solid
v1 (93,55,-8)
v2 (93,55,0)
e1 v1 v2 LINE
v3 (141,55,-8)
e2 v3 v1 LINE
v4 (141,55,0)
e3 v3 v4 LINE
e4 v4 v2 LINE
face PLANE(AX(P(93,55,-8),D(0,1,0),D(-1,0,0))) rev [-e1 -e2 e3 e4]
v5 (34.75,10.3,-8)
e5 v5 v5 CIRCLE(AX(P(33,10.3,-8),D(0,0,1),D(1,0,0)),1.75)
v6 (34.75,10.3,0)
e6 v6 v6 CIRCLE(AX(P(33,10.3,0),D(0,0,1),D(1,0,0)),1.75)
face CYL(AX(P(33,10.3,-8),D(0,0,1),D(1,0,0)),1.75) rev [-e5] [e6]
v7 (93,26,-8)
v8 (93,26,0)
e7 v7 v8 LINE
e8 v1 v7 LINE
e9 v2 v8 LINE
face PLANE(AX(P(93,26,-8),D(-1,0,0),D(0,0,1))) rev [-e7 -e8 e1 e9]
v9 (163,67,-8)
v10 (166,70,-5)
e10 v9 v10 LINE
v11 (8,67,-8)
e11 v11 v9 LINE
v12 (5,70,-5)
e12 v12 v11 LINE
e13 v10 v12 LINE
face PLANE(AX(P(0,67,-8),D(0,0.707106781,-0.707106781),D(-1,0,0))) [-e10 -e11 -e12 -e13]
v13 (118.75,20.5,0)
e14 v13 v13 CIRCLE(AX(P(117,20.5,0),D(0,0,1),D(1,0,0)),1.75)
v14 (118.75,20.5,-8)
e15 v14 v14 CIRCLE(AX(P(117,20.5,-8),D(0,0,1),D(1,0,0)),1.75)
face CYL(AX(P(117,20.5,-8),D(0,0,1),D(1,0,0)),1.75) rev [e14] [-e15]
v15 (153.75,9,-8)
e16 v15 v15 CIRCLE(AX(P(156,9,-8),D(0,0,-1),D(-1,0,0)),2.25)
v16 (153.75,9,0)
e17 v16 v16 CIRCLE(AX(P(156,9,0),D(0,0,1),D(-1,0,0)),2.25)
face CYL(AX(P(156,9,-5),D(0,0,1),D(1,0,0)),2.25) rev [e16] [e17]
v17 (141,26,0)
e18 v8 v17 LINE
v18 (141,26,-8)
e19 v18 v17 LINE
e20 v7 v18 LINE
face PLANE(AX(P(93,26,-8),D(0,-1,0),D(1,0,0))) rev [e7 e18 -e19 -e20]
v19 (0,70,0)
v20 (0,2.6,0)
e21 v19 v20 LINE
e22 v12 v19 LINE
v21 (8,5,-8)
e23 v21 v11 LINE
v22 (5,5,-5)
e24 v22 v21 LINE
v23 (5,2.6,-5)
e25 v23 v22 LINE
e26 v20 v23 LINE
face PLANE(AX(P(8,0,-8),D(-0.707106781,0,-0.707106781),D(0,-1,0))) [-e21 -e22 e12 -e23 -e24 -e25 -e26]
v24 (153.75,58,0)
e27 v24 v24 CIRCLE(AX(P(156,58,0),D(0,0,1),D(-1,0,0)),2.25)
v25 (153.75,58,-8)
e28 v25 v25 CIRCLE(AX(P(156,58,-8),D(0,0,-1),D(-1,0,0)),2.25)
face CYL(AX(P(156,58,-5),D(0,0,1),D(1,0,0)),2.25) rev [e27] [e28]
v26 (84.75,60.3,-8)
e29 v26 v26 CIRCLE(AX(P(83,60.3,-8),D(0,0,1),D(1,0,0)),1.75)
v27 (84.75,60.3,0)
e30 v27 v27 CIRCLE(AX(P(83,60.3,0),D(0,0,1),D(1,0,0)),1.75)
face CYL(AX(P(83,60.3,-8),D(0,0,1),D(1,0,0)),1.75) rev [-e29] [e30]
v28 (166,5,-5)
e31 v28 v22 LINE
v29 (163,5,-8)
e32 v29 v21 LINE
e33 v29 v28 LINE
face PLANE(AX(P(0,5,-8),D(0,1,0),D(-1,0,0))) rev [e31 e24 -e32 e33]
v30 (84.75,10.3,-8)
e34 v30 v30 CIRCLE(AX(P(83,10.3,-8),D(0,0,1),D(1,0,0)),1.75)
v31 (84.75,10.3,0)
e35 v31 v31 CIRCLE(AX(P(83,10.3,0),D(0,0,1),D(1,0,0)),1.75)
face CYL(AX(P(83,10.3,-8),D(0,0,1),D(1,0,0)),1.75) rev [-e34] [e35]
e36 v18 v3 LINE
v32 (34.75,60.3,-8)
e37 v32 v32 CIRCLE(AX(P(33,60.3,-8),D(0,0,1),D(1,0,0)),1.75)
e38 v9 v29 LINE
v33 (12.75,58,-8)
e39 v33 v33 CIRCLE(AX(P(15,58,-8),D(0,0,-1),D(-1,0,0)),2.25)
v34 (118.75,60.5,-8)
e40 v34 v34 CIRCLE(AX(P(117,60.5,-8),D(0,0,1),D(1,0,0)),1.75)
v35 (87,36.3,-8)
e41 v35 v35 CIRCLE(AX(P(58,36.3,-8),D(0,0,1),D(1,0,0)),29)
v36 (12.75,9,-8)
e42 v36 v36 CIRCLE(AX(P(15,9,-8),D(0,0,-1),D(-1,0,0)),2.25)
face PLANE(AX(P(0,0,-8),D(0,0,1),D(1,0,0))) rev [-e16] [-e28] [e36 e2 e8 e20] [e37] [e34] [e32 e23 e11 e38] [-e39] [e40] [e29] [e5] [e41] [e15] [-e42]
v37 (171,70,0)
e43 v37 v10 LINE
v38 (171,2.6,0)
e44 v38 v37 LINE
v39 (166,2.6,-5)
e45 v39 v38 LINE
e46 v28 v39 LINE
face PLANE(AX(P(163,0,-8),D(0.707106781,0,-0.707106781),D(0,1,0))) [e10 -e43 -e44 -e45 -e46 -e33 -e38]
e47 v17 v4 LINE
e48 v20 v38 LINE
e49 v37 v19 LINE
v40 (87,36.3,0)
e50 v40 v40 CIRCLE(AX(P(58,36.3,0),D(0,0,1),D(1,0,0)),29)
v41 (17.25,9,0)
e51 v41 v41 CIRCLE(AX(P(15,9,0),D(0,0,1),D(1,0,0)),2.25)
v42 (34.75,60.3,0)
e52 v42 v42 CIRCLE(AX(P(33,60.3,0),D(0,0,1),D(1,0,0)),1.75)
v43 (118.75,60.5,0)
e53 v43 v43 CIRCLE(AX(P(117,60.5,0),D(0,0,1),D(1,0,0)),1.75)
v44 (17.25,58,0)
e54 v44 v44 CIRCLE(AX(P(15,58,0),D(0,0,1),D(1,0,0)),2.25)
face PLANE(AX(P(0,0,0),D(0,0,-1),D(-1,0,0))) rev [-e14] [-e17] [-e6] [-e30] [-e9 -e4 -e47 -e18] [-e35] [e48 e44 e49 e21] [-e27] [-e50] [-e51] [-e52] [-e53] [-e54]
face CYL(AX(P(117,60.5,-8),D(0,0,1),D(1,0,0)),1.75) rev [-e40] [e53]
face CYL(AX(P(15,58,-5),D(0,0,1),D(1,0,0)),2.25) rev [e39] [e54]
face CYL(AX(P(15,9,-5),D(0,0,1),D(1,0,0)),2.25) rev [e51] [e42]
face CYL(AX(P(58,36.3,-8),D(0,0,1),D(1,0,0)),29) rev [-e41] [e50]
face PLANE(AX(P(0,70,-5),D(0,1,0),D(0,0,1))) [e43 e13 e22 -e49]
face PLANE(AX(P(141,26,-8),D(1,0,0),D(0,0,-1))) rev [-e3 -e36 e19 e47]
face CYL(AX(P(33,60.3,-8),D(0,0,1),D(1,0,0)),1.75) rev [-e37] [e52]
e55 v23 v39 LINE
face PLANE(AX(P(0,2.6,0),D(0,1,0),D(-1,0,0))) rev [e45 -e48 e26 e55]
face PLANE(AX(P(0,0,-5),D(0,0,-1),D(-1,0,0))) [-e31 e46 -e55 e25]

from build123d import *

# Parameters (mm, degrees)
SKETCH1_W           = 171
SKETCH1_H           = 70
SKETCH1_R           = 2.25
BOSS_EXTRUDE1_DEPTH = 5
SKETCH2_W           = 171
SKETCH2_H           = 65
SKETCH2_R           = 2.25
BOSS_EXTRUDE2_DEPTH = 3
CHAMFER1_SIZE       = 8
CHAMFER3_SIZE       = 3
SKETCH3_W           = 7.071067812
SKETCH3_H           = 2.6
CUT_EXTRUDE1_DEPTH  = 199.002168661
SKETCH4_R           = 29
SKETCH4_R_2         = 1.75
SKETCH4_W           = 48
SKETCH4_H           = 29
CUT_EXTRUDE2_DEPTH  = 185.945938047


with BuildPart() as part:
    # Sketch1 → Boss-Extrude1 (new body)
    with BuildSketch(Plane.XY):
        with Locations((85.5, 35)):
            Rectangle(SKETCH1_W, SKETCH1_H)
        with Locations((15, 9)):
            Circle(SKETCH1_R, mode=Mode.SUBTRACT)
        with Locations(Location((156, 9, 0), (0, 0, 180))):
            Circle(SKETCH1_R, mode=Mode.SUBTRACT)
        with Locations((15, 58)):
            Circle(SKETCH1_R, mode=Mode.SUBTRACT)
        with Locations(Location((156, 58, 0), (0, 0, 180))):
            Circle(SKETCH1_R, mode=Mode.SUBTRACT)
    extrude(amount=-BOSS_EXTRUDE1_DEPTH)

    # Sketch2 → Boss-Extrude2 (add)
    with BuildSketch(Plane(origin=(0, 0, -5), x_dir=(-1, 0, 0), z_dir=(0, 0, -1))):
        with Locations((-85.5, 37.5)):
            Rectangle(SKETCH2_W, SKETCH2_H)
        with Locations(Location((-15, 9, 0), (0, 0, 180))):
            Circle(SKETCH2_R, mode=Mode.SUBTRACT)
        with Locations((-156, 9)):
            Circle(SKETCH2_R, mode=Mode.SUBTRACT)
        with Locations(Location((-15, 58, 0), (0, 0, 180))):
            Circle(SKETCH2_R, mode=Mode.SUBTRACT)
        with Locations((-156, 58)):
            Circle(SKETCH2_R, mode=Mode.SUBTRACT)
    extrude(amount=BOSS_EXTRUDE2_DEPTH)

    # Chamfer1
    # the kernel refuses this chamfer: 8 mm, written as the material it takes off along each edge
    with BuildSketch(Plane(origin=(171, -15.573463904, -8), x_dir=(-0.9996219169112968, 0, -0.027495876610586296), z_dir=(0, 1, 0)), Plane(origin=(0, 90.573463904, -8), x_dir=(0.9996219169112968, 0, -0.027495876610586275), z_dir=(0, -1, 0))) as chamfer1_piece_1:
        Polygon((CHAMFER1_SIZE * 0.999621916911, CHAMFER1_SIZE * 0.0274958766106), (-CHAMFER1_SIZE * 0.0274958766106, CHAMFER1_SIZE * 0.999621916911), (0, 0), align=None)
    extrude(amount=106.146927807, mode=Mode.SUBTRACT)

    # Chamfer3
    chamfer3_edges = [part.edges().sort_by_distance(p)[0] for p in [
        (85.5, 70, -8),
    ]]
    chamfer(chamfer3_edges, length=CHAMFER3_SIZE)

    # Sketch3 → Cut-Extrude1 (cut, through all, along a direction that is not the sketch's normal)
    with BuildSketch(Plane(origin=(85.5, 0, -85.5), x_dir=(-0.7071067811865452, 0, -0.7071067811865498), z_dir=(0.7071067811865498, 0, -0.7071067811865452))):
        with Locations((-117.379725677, 1.3)):
            Rectangle(SKETCH3_W, SKETCH3_H)
    extrude(amount=-CUT_EXTRUDE1_DEPTH, dir=(1, 0, 0), mode=Mode.SUBTRACT)

    # Sketch4 → Cut-Extrude2 (cut, through all)
    with BuildSketch(Plane.XY):
        with Locations((58, 36.3)):
            Circle(SKETCH4_R)
        with Locations((33, 60.3)):
            Circle(SKETCH4_R_2)
        with Locations((83, 60.3)):
            Circle(SKETCH4_R_2)
        with Locations((83, 10.3)):
            Circle(SKETCH4_R_2)
        with Locations((33, 10.3)):
            Circle(SKETCH4_R_2)
        with Locations((117, 60.5)):
            Circle(SKETCH4_R_2)
        with Locations((117, 20.5)):
            Circle(SKETCH4_R_2)
        with Locations((117, 40.5)):
            Rectangle(SKETCH4_W, SKETCH4_H)
    extrude(amount=-CUT_EXTRUDE2_DEPTH, mode=Mode.SUBTRACT)


solid = part.part
